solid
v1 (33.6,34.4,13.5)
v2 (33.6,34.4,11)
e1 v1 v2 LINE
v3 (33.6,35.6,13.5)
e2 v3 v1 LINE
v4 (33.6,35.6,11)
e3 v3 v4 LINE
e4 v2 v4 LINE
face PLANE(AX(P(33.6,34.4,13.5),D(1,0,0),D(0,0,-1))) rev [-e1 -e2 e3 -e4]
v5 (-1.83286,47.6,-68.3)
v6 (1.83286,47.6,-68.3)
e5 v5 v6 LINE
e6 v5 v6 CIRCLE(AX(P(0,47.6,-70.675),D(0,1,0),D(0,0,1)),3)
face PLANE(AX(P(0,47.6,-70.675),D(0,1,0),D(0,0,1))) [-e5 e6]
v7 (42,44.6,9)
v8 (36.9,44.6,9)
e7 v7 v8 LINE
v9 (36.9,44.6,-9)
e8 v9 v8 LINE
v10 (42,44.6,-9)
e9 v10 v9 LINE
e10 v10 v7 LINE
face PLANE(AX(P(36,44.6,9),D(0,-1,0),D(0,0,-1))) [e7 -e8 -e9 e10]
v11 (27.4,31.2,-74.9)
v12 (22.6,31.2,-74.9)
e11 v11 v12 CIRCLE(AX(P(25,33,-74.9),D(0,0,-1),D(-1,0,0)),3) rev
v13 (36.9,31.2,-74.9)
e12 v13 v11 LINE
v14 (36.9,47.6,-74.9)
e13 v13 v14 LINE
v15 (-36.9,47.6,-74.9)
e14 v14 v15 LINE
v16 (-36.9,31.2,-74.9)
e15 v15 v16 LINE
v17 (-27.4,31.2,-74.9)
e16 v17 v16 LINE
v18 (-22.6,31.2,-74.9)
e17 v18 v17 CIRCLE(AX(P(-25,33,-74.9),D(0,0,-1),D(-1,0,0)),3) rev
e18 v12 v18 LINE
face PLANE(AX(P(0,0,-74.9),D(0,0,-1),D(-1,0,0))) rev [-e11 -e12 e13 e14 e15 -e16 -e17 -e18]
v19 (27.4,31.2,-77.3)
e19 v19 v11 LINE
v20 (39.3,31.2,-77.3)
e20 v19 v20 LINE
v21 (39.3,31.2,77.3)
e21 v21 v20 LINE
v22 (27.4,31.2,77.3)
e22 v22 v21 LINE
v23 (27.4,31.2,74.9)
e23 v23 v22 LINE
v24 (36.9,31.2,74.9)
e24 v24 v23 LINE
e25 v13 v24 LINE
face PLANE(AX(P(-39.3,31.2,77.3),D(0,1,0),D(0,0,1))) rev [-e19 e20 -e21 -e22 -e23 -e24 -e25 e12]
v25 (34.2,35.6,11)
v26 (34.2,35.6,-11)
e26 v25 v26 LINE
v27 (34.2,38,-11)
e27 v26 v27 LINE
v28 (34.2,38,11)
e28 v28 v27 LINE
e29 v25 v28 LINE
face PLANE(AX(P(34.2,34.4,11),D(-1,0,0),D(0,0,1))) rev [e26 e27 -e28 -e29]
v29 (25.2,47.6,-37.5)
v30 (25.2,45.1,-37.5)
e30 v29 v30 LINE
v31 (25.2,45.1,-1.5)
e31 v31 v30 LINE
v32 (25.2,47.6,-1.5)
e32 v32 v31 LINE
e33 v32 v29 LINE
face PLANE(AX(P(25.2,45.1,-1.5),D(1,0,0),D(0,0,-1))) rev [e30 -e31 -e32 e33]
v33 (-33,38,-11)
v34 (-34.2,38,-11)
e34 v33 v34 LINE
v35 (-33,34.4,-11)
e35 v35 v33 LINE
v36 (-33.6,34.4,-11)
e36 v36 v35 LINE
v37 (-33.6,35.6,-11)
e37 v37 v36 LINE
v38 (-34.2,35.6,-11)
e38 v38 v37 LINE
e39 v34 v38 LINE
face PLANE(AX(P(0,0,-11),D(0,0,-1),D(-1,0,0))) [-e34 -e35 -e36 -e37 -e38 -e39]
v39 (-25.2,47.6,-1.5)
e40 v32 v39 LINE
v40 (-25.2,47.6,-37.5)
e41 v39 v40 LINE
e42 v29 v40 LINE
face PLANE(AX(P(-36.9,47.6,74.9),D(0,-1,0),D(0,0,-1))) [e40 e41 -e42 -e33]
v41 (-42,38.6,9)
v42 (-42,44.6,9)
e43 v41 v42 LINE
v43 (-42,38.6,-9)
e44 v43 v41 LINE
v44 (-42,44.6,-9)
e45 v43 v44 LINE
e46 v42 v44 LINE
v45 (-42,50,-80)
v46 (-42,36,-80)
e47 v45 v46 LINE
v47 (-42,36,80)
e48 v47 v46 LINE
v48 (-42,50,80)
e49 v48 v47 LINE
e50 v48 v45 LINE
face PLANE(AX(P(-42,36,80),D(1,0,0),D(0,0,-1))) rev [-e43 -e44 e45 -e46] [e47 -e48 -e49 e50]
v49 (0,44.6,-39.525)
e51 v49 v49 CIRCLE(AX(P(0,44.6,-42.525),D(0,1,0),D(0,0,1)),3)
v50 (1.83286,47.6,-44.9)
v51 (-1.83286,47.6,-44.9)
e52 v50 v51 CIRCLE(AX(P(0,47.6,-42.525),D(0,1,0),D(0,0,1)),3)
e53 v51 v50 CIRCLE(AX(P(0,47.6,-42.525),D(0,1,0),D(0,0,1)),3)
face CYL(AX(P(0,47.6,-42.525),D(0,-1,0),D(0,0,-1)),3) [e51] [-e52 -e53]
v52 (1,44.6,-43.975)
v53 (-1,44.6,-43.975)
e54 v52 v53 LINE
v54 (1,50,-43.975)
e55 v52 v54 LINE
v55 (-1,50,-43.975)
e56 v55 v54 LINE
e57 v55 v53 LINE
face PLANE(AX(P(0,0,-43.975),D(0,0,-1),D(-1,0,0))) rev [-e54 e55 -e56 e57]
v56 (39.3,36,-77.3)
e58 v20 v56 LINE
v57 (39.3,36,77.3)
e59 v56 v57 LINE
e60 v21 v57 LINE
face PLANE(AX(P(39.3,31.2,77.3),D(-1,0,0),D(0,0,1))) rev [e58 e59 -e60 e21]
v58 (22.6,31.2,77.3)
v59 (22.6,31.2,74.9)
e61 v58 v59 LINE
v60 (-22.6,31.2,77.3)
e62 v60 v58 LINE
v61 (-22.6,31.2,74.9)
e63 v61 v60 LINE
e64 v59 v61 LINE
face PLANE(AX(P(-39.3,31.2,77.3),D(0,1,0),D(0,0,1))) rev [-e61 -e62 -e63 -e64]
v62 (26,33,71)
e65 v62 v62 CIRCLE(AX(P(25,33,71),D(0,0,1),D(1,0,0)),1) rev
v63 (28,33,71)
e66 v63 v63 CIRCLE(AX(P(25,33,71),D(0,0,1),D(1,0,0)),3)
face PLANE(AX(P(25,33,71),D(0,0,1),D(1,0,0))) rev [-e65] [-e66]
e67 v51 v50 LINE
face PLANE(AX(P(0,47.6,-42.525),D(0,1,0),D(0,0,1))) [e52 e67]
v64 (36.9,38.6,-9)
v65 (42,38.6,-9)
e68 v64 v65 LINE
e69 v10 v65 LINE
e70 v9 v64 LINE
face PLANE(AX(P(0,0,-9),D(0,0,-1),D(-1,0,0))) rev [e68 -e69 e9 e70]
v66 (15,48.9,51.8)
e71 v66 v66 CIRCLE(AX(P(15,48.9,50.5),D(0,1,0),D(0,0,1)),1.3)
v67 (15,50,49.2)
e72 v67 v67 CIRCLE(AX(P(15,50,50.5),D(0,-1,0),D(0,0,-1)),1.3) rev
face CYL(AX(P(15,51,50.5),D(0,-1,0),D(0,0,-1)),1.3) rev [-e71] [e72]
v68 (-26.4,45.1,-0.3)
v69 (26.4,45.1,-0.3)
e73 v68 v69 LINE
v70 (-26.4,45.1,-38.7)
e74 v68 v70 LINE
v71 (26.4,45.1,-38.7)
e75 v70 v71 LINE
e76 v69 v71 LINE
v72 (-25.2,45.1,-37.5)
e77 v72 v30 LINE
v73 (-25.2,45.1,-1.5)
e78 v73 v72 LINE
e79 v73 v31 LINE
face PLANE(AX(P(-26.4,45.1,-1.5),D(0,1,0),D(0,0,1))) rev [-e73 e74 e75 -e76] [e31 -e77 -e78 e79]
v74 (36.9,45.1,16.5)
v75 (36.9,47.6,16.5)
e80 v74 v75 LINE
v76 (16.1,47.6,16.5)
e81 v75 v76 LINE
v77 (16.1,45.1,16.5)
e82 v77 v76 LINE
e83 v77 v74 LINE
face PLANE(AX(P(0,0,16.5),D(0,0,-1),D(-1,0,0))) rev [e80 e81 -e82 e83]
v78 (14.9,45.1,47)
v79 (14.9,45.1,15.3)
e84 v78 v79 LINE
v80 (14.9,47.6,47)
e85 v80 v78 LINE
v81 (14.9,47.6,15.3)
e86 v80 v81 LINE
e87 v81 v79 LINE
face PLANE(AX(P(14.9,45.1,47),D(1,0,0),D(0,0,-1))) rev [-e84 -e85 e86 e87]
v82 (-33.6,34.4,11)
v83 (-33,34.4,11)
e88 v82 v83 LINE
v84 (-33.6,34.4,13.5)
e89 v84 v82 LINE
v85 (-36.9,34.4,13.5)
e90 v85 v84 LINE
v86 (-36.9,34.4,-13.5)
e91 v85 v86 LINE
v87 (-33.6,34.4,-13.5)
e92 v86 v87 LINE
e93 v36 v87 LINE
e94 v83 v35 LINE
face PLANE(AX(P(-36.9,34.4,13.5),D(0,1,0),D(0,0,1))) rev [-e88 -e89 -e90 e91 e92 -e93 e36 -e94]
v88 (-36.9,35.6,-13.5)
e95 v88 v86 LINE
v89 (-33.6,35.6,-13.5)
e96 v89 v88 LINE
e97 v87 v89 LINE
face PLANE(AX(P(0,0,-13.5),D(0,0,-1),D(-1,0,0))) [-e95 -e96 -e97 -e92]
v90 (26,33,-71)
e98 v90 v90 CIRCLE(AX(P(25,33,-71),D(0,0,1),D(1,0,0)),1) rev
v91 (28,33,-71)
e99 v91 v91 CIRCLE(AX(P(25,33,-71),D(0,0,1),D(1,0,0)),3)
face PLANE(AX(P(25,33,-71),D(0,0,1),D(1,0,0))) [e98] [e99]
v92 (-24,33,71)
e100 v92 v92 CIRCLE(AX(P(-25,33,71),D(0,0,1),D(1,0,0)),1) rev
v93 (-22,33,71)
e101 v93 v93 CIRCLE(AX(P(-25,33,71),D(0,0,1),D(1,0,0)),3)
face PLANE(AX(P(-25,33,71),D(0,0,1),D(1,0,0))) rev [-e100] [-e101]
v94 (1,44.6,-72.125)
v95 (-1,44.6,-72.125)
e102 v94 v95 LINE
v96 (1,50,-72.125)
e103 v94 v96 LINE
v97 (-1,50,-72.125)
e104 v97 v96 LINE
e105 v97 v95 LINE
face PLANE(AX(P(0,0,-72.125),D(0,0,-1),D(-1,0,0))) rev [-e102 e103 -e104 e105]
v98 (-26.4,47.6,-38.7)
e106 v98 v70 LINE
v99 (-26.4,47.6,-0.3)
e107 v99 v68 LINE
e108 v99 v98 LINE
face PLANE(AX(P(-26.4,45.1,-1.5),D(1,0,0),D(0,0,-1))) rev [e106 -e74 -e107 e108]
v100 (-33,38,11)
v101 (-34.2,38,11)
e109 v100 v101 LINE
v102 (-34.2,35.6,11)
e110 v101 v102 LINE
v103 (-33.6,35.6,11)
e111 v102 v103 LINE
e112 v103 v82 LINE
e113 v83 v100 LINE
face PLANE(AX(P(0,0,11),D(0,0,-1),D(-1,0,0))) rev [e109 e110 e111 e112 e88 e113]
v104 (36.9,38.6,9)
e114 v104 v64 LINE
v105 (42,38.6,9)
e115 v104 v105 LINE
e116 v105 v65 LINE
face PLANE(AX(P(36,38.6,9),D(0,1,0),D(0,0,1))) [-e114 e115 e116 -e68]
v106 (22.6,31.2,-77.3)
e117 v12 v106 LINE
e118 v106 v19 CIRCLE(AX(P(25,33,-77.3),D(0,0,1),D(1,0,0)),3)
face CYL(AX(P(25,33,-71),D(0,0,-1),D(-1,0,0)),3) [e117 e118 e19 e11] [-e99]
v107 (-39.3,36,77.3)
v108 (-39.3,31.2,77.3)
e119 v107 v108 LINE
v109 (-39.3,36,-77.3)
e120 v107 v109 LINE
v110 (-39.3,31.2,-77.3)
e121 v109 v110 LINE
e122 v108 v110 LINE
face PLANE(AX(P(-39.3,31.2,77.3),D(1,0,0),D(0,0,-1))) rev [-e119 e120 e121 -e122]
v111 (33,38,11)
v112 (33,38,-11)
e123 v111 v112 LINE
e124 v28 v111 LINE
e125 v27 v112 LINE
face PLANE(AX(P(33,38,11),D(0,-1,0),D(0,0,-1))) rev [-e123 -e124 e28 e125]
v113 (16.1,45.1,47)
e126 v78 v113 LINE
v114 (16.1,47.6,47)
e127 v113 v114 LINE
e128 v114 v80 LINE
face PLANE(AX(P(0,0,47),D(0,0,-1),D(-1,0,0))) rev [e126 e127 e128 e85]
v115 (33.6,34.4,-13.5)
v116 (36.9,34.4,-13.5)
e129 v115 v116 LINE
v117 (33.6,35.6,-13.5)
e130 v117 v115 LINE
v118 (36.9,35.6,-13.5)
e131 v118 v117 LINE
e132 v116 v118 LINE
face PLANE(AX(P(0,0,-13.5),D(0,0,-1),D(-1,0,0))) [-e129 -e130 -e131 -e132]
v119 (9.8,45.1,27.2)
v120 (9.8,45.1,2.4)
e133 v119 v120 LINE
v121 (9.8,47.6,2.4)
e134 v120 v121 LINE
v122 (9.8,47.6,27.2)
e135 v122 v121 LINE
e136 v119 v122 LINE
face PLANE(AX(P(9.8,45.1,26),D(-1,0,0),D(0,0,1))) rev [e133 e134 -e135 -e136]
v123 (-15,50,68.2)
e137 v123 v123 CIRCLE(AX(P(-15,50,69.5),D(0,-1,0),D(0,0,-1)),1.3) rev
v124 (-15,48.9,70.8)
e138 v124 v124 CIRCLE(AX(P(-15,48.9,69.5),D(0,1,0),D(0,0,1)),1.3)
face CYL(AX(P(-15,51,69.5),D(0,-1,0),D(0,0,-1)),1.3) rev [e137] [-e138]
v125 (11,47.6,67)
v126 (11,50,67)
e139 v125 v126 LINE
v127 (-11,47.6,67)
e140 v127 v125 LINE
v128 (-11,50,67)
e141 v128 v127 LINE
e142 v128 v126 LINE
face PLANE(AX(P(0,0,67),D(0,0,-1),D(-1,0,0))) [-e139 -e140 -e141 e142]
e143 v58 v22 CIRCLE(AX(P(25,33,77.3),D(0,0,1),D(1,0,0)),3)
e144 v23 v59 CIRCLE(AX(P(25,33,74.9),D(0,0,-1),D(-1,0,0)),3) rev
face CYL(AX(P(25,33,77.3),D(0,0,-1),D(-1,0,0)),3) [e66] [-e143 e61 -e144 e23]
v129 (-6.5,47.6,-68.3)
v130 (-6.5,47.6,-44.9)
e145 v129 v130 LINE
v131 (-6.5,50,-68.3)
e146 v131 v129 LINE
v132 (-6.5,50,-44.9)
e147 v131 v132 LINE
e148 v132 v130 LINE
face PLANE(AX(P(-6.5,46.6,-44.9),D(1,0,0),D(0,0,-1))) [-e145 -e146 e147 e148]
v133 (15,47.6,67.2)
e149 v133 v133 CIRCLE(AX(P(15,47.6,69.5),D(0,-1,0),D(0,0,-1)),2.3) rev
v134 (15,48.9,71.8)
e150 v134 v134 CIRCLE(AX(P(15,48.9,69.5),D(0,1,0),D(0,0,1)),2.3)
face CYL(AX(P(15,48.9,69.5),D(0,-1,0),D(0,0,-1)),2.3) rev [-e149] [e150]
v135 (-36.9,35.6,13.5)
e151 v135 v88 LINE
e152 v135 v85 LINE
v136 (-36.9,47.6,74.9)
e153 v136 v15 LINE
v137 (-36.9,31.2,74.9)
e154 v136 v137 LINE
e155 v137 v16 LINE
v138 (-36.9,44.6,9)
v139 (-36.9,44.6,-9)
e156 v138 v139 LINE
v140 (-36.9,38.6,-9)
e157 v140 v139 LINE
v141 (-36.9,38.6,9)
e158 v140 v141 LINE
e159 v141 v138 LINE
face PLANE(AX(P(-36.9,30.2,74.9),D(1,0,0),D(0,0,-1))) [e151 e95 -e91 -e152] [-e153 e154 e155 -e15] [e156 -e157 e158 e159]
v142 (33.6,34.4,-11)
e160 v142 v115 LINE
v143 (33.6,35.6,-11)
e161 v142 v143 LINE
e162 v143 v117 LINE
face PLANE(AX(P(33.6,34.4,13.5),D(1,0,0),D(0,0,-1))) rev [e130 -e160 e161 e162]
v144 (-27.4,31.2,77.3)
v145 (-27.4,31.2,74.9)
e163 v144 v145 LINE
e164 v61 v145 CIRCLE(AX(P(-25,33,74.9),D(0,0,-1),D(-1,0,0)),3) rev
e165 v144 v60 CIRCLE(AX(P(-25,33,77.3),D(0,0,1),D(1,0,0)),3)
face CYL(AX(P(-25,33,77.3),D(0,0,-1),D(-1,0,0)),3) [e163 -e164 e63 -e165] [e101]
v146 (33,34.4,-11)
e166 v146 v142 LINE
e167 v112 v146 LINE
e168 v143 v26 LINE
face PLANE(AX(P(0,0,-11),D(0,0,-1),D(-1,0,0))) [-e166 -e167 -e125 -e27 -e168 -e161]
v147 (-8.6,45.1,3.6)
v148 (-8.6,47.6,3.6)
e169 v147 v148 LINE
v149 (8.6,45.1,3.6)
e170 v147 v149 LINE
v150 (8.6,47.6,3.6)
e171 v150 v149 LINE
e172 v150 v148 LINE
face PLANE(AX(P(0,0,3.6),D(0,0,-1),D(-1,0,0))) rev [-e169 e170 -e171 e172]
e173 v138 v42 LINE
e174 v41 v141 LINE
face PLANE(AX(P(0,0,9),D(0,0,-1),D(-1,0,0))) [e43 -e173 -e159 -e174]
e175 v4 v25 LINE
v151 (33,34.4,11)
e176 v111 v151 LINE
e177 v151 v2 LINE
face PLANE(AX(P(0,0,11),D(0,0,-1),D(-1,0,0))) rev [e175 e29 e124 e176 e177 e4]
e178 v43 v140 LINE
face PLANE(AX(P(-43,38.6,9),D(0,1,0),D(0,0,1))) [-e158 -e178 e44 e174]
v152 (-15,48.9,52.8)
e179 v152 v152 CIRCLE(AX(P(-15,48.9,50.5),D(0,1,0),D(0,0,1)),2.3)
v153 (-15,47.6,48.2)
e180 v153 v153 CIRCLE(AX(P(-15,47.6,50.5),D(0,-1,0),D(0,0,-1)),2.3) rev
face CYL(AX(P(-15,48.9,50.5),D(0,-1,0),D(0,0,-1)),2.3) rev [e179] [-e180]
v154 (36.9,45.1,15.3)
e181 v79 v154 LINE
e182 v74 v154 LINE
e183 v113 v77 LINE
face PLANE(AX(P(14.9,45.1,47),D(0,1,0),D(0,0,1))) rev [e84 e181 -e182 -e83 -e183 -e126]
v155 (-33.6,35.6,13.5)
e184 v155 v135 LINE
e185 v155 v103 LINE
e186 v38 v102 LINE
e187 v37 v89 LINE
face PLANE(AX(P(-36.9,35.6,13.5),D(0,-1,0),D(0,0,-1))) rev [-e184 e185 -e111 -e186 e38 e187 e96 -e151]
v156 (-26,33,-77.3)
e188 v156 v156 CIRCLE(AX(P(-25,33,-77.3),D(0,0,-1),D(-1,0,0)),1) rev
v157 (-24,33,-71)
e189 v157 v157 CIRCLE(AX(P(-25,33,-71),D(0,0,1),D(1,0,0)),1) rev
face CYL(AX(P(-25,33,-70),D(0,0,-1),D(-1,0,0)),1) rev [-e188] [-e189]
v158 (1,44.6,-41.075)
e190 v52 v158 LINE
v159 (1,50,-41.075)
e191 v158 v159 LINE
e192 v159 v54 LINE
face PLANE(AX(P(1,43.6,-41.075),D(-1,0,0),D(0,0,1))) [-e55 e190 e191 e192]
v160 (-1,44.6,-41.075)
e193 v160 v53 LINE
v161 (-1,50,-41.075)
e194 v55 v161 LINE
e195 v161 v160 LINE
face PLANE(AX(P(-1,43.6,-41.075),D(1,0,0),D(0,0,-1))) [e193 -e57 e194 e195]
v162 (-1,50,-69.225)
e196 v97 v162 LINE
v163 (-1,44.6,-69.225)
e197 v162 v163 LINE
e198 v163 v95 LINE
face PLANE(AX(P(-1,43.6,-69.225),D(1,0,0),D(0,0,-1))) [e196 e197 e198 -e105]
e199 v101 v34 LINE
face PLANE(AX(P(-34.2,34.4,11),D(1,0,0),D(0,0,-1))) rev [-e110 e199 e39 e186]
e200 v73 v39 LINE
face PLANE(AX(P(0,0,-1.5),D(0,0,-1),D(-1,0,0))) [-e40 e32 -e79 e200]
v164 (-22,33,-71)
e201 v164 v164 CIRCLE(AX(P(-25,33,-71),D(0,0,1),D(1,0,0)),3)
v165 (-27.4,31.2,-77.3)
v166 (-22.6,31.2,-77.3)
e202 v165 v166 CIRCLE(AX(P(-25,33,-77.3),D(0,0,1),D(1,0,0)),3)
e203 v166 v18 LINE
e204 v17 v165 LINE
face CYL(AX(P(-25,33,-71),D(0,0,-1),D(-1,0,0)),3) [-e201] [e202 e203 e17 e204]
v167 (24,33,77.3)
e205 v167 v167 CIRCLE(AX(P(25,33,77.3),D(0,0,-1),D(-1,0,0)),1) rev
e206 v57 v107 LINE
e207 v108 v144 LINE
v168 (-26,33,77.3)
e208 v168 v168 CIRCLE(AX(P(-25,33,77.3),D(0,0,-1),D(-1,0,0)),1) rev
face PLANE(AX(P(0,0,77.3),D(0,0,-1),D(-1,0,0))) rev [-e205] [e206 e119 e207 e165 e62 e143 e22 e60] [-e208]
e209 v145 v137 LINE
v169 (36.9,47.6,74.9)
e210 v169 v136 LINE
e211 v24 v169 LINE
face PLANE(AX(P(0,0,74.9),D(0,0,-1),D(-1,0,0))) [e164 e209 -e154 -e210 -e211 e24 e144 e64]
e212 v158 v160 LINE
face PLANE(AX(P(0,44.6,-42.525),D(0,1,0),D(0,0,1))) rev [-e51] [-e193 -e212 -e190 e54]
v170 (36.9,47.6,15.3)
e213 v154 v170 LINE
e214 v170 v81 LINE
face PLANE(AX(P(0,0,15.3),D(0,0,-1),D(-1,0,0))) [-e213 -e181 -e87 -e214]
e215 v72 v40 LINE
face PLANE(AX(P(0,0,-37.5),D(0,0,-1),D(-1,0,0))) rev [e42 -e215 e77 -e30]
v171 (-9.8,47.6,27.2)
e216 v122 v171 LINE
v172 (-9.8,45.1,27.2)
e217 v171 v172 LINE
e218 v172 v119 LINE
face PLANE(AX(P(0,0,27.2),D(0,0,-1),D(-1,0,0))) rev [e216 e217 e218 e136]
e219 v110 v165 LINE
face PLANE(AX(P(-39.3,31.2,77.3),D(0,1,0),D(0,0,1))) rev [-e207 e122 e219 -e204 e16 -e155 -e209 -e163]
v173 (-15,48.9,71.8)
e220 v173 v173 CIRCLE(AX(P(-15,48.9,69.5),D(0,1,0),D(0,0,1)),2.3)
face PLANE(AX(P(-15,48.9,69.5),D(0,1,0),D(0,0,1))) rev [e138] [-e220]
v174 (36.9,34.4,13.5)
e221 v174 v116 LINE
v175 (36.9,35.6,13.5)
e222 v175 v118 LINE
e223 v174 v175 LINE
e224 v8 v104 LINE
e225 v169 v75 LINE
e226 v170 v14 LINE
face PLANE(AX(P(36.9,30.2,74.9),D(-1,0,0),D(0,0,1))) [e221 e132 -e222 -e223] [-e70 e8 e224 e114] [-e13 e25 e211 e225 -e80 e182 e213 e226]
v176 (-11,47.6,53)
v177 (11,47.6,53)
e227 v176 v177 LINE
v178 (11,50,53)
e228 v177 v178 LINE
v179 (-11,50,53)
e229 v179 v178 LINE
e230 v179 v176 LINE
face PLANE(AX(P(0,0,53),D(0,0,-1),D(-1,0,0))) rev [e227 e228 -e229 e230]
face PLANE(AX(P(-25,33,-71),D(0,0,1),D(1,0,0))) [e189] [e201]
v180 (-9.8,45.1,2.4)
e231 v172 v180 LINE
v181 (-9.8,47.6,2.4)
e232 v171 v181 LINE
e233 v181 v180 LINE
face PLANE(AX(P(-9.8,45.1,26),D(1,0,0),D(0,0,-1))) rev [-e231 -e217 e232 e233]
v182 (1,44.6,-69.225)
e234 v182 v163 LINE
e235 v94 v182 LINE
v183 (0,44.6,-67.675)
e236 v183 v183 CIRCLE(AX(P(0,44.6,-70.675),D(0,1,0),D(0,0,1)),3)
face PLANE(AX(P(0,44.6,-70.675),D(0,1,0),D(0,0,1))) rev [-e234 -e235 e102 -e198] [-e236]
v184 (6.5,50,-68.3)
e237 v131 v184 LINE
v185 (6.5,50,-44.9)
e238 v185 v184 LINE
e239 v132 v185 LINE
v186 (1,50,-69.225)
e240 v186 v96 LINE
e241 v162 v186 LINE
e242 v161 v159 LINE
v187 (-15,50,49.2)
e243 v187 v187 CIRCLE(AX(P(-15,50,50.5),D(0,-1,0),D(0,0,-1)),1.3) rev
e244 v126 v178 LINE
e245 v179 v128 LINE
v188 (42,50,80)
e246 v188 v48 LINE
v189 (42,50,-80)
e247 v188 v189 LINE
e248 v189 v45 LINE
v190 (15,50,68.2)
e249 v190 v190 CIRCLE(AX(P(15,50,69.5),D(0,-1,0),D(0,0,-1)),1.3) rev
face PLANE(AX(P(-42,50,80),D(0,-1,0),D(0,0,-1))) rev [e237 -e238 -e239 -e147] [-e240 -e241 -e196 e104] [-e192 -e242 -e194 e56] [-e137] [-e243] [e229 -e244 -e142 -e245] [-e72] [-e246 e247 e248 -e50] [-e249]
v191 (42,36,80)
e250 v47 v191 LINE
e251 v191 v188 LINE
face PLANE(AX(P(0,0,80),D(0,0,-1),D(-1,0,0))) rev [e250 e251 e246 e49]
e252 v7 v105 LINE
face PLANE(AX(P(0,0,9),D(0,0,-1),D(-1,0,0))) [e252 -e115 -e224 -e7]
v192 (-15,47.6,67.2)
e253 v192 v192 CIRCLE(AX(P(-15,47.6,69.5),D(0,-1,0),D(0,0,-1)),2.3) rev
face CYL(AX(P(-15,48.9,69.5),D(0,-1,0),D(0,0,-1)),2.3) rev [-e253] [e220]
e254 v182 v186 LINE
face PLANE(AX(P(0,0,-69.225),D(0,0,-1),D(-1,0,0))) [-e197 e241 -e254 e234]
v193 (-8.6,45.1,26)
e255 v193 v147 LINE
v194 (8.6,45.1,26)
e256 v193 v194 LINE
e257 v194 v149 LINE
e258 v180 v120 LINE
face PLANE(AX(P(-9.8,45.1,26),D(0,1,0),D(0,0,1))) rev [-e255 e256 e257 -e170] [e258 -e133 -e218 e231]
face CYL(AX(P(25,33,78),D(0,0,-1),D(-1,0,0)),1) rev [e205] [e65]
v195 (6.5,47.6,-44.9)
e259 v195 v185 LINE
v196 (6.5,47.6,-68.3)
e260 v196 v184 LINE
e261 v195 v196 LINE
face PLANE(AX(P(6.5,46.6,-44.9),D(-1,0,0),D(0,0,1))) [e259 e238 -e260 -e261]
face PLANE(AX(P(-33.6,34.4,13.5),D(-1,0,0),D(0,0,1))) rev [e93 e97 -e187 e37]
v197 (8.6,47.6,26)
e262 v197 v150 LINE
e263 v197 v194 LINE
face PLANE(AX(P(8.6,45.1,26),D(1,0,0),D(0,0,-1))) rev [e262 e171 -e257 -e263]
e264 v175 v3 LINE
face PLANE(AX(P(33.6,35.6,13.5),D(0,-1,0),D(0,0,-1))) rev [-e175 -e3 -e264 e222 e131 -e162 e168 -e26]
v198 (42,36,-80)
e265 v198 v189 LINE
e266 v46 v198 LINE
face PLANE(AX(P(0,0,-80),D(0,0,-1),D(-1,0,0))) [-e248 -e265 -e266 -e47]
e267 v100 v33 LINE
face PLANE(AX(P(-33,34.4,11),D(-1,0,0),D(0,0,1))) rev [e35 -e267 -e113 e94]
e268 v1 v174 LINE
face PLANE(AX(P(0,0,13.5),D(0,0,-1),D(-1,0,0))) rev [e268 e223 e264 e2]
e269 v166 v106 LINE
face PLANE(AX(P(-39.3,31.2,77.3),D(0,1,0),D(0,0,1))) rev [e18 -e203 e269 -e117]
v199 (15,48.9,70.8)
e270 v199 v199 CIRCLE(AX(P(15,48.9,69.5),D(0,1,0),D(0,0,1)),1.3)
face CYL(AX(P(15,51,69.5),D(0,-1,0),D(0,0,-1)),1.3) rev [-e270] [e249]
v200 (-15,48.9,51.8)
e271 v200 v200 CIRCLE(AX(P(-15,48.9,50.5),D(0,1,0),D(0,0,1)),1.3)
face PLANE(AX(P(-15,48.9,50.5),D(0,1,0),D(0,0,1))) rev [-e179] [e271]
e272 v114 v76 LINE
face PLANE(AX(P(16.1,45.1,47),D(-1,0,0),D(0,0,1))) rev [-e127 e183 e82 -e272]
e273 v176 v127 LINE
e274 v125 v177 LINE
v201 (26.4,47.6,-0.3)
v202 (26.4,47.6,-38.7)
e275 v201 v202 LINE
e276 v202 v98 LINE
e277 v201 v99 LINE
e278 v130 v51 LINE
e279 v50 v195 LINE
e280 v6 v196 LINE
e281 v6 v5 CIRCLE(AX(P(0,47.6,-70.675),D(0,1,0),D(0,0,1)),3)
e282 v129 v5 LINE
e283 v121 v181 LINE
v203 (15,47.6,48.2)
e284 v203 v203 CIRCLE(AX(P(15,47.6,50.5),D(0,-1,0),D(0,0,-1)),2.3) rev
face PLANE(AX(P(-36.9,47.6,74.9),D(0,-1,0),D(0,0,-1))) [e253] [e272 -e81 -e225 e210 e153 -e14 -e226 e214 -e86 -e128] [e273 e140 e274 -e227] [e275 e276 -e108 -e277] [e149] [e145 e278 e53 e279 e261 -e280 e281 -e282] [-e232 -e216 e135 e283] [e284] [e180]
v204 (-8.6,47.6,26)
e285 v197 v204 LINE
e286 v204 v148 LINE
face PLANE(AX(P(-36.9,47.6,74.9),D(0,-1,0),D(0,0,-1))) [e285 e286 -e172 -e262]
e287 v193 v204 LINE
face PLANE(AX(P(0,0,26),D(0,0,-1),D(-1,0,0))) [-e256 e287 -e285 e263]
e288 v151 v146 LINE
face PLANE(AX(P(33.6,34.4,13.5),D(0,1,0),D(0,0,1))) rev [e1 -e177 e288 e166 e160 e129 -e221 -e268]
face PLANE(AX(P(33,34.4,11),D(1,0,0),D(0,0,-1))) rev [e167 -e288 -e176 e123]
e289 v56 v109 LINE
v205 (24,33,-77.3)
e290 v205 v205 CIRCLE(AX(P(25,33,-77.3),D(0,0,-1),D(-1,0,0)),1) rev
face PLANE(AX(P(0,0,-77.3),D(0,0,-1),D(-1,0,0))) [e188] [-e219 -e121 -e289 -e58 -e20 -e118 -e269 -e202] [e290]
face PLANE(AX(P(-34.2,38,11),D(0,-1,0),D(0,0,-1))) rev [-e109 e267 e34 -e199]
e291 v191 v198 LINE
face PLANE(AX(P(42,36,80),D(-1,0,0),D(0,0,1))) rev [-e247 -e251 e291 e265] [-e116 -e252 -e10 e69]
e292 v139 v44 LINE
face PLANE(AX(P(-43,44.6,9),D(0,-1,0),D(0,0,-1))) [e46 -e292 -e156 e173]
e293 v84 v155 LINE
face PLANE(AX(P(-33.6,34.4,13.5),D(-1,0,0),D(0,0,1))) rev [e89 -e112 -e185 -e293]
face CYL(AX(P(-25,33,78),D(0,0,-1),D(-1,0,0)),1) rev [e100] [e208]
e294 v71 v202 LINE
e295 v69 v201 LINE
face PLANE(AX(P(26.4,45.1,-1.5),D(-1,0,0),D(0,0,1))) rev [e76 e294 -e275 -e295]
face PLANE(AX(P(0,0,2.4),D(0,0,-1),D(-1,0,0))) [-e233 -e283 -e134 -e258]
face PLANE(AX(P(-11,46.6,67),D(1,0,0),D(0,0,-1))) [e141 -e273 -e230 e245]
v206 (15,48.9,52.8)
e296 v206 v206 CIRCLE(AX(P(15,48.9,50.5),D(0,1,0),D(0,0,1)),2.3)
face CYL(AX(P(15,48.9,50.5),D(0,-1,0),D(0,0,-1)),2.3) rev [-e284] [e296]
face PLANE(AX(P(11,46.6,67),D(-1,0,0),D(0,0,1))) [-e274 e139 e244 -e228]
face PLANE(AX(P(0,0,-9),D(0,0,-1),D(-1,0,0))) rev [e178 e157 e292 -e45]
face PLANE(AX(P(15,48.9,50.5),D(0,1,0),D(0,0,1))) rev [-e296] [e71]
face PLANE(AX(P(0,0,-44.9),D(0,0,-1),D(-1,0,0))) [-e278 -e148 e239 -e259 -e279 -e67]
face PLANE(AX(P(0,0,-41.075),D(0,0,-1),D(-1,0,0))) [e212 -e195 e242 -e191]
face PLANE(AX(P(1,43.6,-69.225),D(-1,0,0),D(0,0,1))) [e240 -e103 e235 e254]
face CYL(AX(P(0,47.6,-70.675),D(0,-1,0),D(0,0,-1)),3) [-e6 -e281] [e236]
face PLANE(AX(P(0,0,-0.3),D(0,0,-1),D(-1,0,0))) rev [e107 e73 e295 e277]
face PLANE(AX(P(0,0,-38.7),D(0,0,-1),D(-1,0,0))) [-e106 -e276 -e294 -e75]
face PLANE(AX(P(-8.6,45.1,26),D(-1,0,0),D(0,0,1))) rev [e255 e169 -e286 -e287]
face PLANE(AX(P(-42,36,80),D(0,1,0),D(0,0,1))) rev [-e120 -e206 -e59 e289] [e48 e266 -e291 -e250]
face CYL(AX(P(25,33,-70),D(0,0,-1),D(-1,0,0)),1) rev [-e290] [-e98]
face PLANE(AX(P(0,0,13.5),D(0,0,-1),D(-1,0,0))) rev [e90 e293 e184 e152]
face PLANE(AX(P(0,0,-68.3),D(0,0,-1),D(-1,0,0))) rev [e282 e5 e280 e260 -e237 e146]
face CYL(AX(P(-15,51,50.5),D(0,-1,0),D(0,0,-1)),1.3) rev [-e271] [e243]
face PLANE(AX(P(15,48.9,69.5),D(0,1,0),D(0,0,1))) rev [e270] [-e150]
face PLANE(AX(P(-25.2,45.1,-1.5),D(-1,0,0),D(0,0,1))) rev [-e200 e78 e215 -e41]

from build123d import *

# Parameters (mm, degrees)
BOSS_EXTRUDE1_START  = -80
SKETCH1_W            = 84
SKETCH1_H            = 14
BOSS_EXTRUDE1_DEPTH  = 160
BOSS_EXTRUDE2_START  = -77.3
SKETCH2_W            = 78.6
SKETCH2_H            = 5.3
BOSS_EXTRUDE2_DEPTH  = 154.6
BOSS_EXTRUDE3_START  = -74.9
SKETCH3_W            = 73.8
SKETCH3_H            = 17.4
BOSS_EXTRUDE3_DEPTH  = 149.8
BOSS_EXTRUDE4_START  = -77.3
SKETCH4_R            = 3
BOSS_EXTRUDE4_DEPTH  = 6.3
BOSS_EXTRUDE5_START  = -78
SKETCH5_R            = 1
BOSS_EXTRUDE5_DEPTH  = 8
BOSS_EXTRUDE6_START  = -77.3
SKETCH6_R            = 3
BOSS_EXTRUDE6_DEPTH  = 6.3
BOSS_EXTRUDE7_START  = -78
SKETCH7_R            = 1
BOSS_EXTRUDE7_DEPTH  = 8
BOSS_EXTRUDE8_START  = 71
SKETCH8_R            = 3
BOSS_EXTRUDE8_DEPTH  = 6.3
BOSS_EXTRUDE9_START  = 70
SKETCH9_R            = 1
BOSS_EXTRUDE9_DEPTH  = 8
BOSS_EXTRUDE10_START = 71
SKETCH10_R           = 3
BOSS_EXTRUDE10_DEPTH = 6.3
BOSS_EXTRUDE11_START = 70
SKETCH11_R           = 1
BOSS_EXTRUDE11_DEPTH = 8
BOSS_EXTRUDE12_START = 53
SKETCH12_W           = 22
SKETCH12_H           = 4.4
BOSS_EXTRUDE12_DEPTH = 14
BOSS_EXTRUDE13_START = 46.6
SKETCH13_R           = 1.3
BOSS_EXTRUDE13_DEPTH = 4.4
BOSS_EXTRUDE14_START = 47.1
SKETCH14_R           = 2.3
BOSS_EXTRUDE14_DEPTH = 1.8
BOSS_EXTRUDE15_START = 46.6
SKETCH15_R           = 1.3
BOSS_EXTRUDE15_DEPTH = 4.4
BOSS_EXTRUDE16_START = 47.1
SKETCH16_R           = 2.3
BOSS_EXTRUDE16_DEPTH = 1.8
BOSS_EXTRUDE17_START = 46.6
SKETCH17_R           = 1.3
BOSS_EXTRUDE17_DEPTH = 4.4
BOSS_EXTRUDE18_START = 47.1
SKETCH18_R           = 2.3
BOSS_EXTRUDE18_DEPTH = 1.8
BOSS_EXTRUDE19_START = 46.6
SKETCH19_R           = 1.3
BOSS_EXTRUDE19_DEPTH = 4.4
BOSS_EXTRUDE20_START = 47.1
SKETCH20_R           = 2.3
BOSS_EXTRUDE20_DEPTH = 1.8
BOSS_EXTRUDE21_START = -68.3
SKETCH21_W           = 13
SKETCH21_H           = 4.4
BOSS_EXTRUDE21_DEPTH = 23.4
BOSS_EXTRUDE22_START = 44.6
SKETCH22_R           = 3
BOSS_EXTRUDE22_DEPTH = 3
BOSS_EXTRUDE23_START = -72.125
SKETCH23_W           = 2
SKETCH23_H           = 7.4
BOSS_EXTRUDE23_DEPTH = 2.9
BOSS_EXTRUDE24_START = 44.6
SKETCH24_R           = 3
BOSS_EXTRUDE24_DEPTH = 3
BOSS_EXTRUDE25_START = -43.975
SKETCH25_W           = 2
SKETCH25_H           = 7.4
BOSS_EXTRUDE25_DEPTH = 2.9
BOSS_EXTRUDE26_START = -9
SKETCH26_W           = 7
SKETCH26_H           = 6
BOSS_EXTRUDE26_DEPTH = 18
BOSS_EXTRUDE27_START = -13.5
SKETCH27_W           = 3.3
SKETCH27_H           = 1.2
BOSS_EXTRUDE27_DEPTH = 27
BOSS_EXTRUDE28_START = -11
SKETCH28_W           = 1.2
SKETCH28_H           = 3.6
BOSS_EXTRUDE28_DEPTH = 22
BOSS_EXTRUDE29_START = -9
SKETCH29_W           = 7
SKETCH29_H           = 6
BOSS_EXTRUDE29_DEPTH = 18
BOSS_EXTRUDE30_START = -13.5
SKETCH30_W           = 3.3
SKETCH30_H           = 1.2
BOSS_EXTRUDE30_DEPTH = 27
BOSS_EXTRUDE31_START = -11
SKETCH31_W           = 1.2
SKETCH31_H           = 3.6
BOSS_EXTRUDE31_DEPTH = 22
BOSS_EXTRUDE32_START = 3.6
SKETCH32_W           = 1.2
SKETCH32_H           = 2.5
BOSS_EXTRUDE32_DEPTH = 22.4
BOSS_EXTRUDE33_START = 3.6
SKETCH33_W           = 1.2
SKETCH33_H           = 2.5
BOSS_EXTRUDE33_DEPTH = 22.4
BOSS_EXTRUDE34_START = 2.4
SKETCH34_W           = 19.6
SKETCH34_H           = 2.5
BOSS_EXTRUDE34_DEPTH = 1.2
BOSS_EXTRUDE35_START = 26
SKETCH35_W           = 19.6
SKETCH35_H           = 2.5
BOSS_EXTRUDE35_DEPTH = 1.2
BOSS_EXTRUDE36_START = 16.5
SKETCH36_W           = 1.2
SKETCH36_H           = 2.5
BOSS_EXTRUDE36_DEPTH = 30.5
BOSS_EXTRUDE37_START = 15.3
SKETCH37_W           = 22
SKETCH37_H           = 2.5
BOSS_EXTRUDE37_DEPTH = 1.2
BOSS_EXTRUDE38_START = -37.5
SKETCH38_W           = 1.2
SKETCH38_H           = 2.5
BOSS_EXTRUDE38_DEPTH = 36
BOSS_EXTRUDE39_START = -37.5
SKETCH39_W           = 1.2
SKETCH39_H           = 2.5
BOSS_EXTRUDE39_DEPTH = 36
BOSS_EXTRUDE40_START = -38.7
SKETCH40_W           = 52.8
SKETCH40_H           = 2.5
BOSS_EXTRUDE40_DEPTH = 1.2
BOSS_EXTRUDE41_START = -1.5
SKETCH41_W           = 52.8
SKETCH41_H           = 2.5
BOSS_EXTRUDE41_DEPTH = 1.2


with BuildPart() as part:
    # Sketch1 → Boss-Extrude1 (new body)
    with BuildSketch(Plane.XY.offset(BOSS_EXTRUDE1_START)):
        with Locations((0, 43)):
            Rectangle(SKETCH1_W, SKETCH1_H)
    extrude(amount=BOSS_EXTRUDE1_DEPTH)

    # Sketch2 → Boss-Extrude2 (add)
    with BuildSketch(Plane.XY.offset(BOSS_EXTRUDE2_START)):
        with Locations((0, 33.85)):
            Rectangle(SKETCH2_W, SKETCH2_H)
    extrude(amount=BOSS_EXTRUDE2_DEPTH)


with BuildPart() as body_2:
    # Sketch3 → Boss-Extrude3 (new body)
    with BuildSketch(Plane.XY.offset(BOSS_EXTRUDE3_START)):
        with Locations((0, 38.9)):
            Rectangle(SKETCH3_W, SKETCH3_H)
    extrude(amount=BOSS_EXTRUDE3_DEPTH)


with BuildPart() as part_1:
    add(part.part)

    # Combine1: cut body 2
    add(body_2.part, mode=Mode.SUBTRACT)

    # Sketch4 → Boss-Extrude4 (add)
    with BuildSketch(Plane.XY.offset(BOSS_EXTRUDE4_START)):
        with Locations((-25, 33)):
            Circle(SKETCH4_R)
    extrude(amount=BOSS_EXTRUDE4_DEPTH)


with BuildPart() as body_2_2:
    # Sketch5 → Boss-Extrude5 (new body)
    with BuildSketch(Plane.XY.offset(BOSS_EXTRUDE5_START)):
        with Locations((-25, 33)):
            Circle(SKETCH5_R)
    extrude(amount=BOSS_EXTRUDE5_DEPTH)


with BuildPart() as part_2:
    add(part_1.part)

    # Combine2: cut body 2 2
    add(body_2_2.part, mode=Mode.SUBTRACT)

    # Sketch6 → Boss-Extrude6 (add)
    with BuildSketch(Plane.XY.offset(BOSS_EXTRUDE6_START)):
        with Locations((25, 33)):
            Circle(SKETCH6_R)
    extrude(amount=BOSS_EXTRUDE6_DEPTH)


with BuildPart() as body_2_3:
    # Sketch7 → Boss-Extrude7 (new body)
    with BuildSketch(Plane.XY.offset(BOSS_EXTRUDE7_START)):
        with Locations((25, 33)):
            Circle(SKETCH7_R)
    extrude(amount=BOSS_EXTRUDE7_DEPTH)


with BuildPart() as part_3:
    add(part_2.part)

    # Combine3: cut body 2 3
    add(body_2_3.part, mode=Mode.SUBTRACT)

    # Sketch8 → Boss-Extrude8 (add)
    with BuildSketch(Plane.XY.offset(BOSS_EXTRUDE8_START)):
        with Locations((-25, 33)):
            Circle(SKETCH8_R)
    extrude(amount=BOSS_EXTRUDE8_DEPTH)


with BuildPart() as body_2_4:
    # Sketch9 → Boss-Extrude9 (new body)
    with BuildSketch(Plane.XY.offset(BOSS_EXTRUDE9_START)):
        with Locations((-25, 33)):
            Circle(SKETCH9_R)
    extrude(amount=BOSS_EXTRUDE9_DEPTH)


with BuildPart() as part_4:
    add(part_3.part)

    # Combine4: cut body 2 4
    add(body_2_4.part, mode=Mode.SUBTRACT)

    # Sketch10 → Boss-Extrude10 (add)
    with BuildSketch(Plane.XY.offset(BOSS_EXTRUDE10_START)):
        with Locations((25, 33)):
            Circle(SKETCH10_R)
    extrude(amount=BOSS_EXTRUDE10_DEPTH)


with BuildPart() as body_2_5:
    # Sketch11 → Boss-Extrude11 (new body)
    with BuildSketch(Plane.XY.offset(BOSS_EXTRUDE11_START)):
        with Locations((25, 33)):
            Circle(SKETCH11_R)
    extrude(amount=BOSS_EXTRUDE11_DEPTH)


with BuildPart() as part_5:
    add(part_4.part)

    # Combine5: cut body 2 5
    add(body_2_5.part, mode=Mode.SUBTRACT)


with BuildPart() as body_2_6:
    # Sketch12 → Boss-Extrude12 (new body)
    with BuildSketch(Plane.XY.offset(BOSS_EXTRUDE12_START)):
        with Locations((0, 48.8)):
            Rectangle(SKETCH12_W, SKETCH12_H)
    extrude(amount=BOSS_EXTRUDE12_DEPTH)


with BuildPart() as part_6:
    add(part_5.part)

    # Combine6: cut body 2 6
    add(body_2_6.part, mode=Mode.SUBTRACT)


with BuildPart() as body_2_7:
    # Sketch13 → Boss-Extrude13 (new body)
    with BuildSketch(Plane(origin=(0, 0, 0), x_dir=(1, 0, 0), z_dir=(0, 1, 0)).offset(BOSS_EXTRUDE13_START)):
        with Locations((-15, -50.5)):
            Circle(SKETCH13_R)
    extrude(amount=BOSS_EXTRUDE13_DEPTH)


with BuildPart() as part_7:
    add(part_6.part)

    # Combine7: cut body 2 7
    add(body_2_7.part, mode=Mode.SUBTRACT)


with BuildPart() as body_2_8:
    # Sketch14 → Boss-Extrude14 (new body)
    with BuildSketch(Plane(origin=(0, 0, 0), x_dir=(1, 0, 0), z_dir=(0, 1, 0)).offset(BOSS_EXTRUDE14_START)):
        with Locations((-15, -50.5)):
            Circle(SKETCH14_R)
    extrude(amount=BOSS_EXTRUDE14_DEPTH)


with BuildPart() as part_8:
    add(part_7.part)

    # Combine8: cut body 2 8
    add(body_2_8.part, mode=Mode.SUBTRACT)


with BuildPart() as body_2_9:
    # Sketch15 → Boss-Extrude15 (new body)
    with BuildSketch(Plane(origin=(0, 0, 0), x_dir=(1, 0, 0), z_dir=(0, 1, 0)).offset(BOSS_EXTRUDE15_START)):
        with Locations((-15, -69.5)):
            Circle(SKETCH15_R)
    extrude(amount=BOSS_EXTRUDE15_DEPTH)


with BuildPart() as part_9:
    add(part_8.part)

    # Combine9: cut body 2 9
    add(body_2_9.part, mode=Mode.SUBTRACT)


with BuildPart() as body_2_10:
    # Sketch16 → Boss-Extrude16 (new body)
    with BuildSketch(Plane(origin=(0, 0, 0), x_dir=(1, 0, 0), z_dir=(0, 1, 0)).offset(BOSS_EXTRUDE16_START)):
        with Locations((-15, -69.5)):
            Circle(SKETCH16_R)
    extrude(amount=BOSS_EXTRUDE16_DEPTH)


with BuildPart() as part_10:
    add(part_9.part)

    # Combine10: cut body 2 10
    add(body_2_10.part, mode=Mode.SUBTRACT)


with BuildPart() as body_2_11:
    # Sketch17 → Boss-Extrude17 (new body)
    with BuildSketch(Plane(origin=(0, 0, 0), x_dir=(1, 0, 0), z_dir=(0, 1, 0)).offset(BOSS_EXTRUDE17_START)):
        with Locations((15, -50.5)):
            Circle(SKETCH17_R)
    extrude(amount=BOSS_EXTRUDE17_DEPTH)


with BuildPart() as part_11:
    add(part_10.part)

    # Combine11: cut body 2 11
    add(body_2_11.part, mode=Mode.SUBTRACT)


with BuildPart() as body_2_12:
    # Sketch18 → Boss-Extrude18 (new body)
    with BuildSketch(Plane(origin=(0, 0, 0), x_dir=(1, 0, 0), z_dir=(0, 1, 0)).offset(BOSS_EXTRUDE18_START)):
        with Locations((15, -50.5)):
            Circle(SKETCH18_R)
    extrude(amount=BOSS_EXTRUDE18_DEPTH)


with BuildPart() as part_12:
    add(part_11.part)

    # Combine12: cut body 2 12
    add(body_2_12.part, mode=Mode.SUBTRACT)


with BuildPart() as body_2_13:
    # Sketch19 → Boss-Extrude19 (new body)
    with BuildSketch(Plane(origin=(0, 0, 0), x_dir=(1, 0, 0), z_dir=(0, 1, 0)).offset(BOSS_EXTRUDE19_START)):
        with Locations((15, -69.5)):
            Circle(SKETCH19_R)
    extrude(amount=BOSS_EXTRUDE19_DEPTH)


with BuildPart() as part_13:
    add(part_12.part)

    # Combine13: cut body 2 13
    add(body_2_13.part, mode=Mode.SUBTRACT)


with BuildPart() as body_2_14:
    # Sketch20 → Boss-Extrude20 (new body)
    with BuildSketch(Plane(origin=(0, 0, 0), x_dir=(1, 0, 0), z_dir=(0, 1, 0)).offset(BOSS_EXTRUDE20_START)):
        with Locations((15, -69.5)):
            Circle(SKETCH20_R)
    extrude(amount=BOSS_EXTRUDE20_DEPTH)


with BuildPart() as part_14:
    add(part_13.part)

    # Combine14: cut body 2 14
    add(body_2_14.part, mode=Mode.SUBTRACT)


with BuildPart() as body_2_15:
    # Sketch21 → Boss-Extrude21 (new body)
    with BuildSketch(Plane.XY.offset(BOSS_EXTRUDE21_START)):
        with Locations((0, 48.8)):
            Rectangle(SKETCH21_W, SKETCH21_H)
    extrude(amount=BOSS_EXTRUDE21_DEPTH)


with BuildPart() as part_15:
    add(part_14.part)

    # Combine15: cut body 2 15
    add(body_2_15.part, mode=Mode.SUBTRACT)

    # Sketch22 → Boss-Extrude22 (add)
    with BuildSketch(Plane(origin=(0, 0, 0), x_dir=(1, 0, 0), z_dir=(0, 1, 0)).offset(BOSS_EXTRUDE22_START)):
        with Locations((0, 70.675)):
            Circle(SKETCH22_R)
    extrude(amount=BOSS_EXTRUDE22_DEPTH)


with BuildPart() as body_2_16:
    # Sketch23 → Boss-Extrude23 (new body)
    with BuildSketch(Plane.XY.offset(BOSS_EXTRUDE23_START)):
        with Locations((0, 47.3)):
            Rectangle(SKETCH23_W, SKETCH23_H)
    extrude(amount=BOSS_EXTRUDE23_DEPTH)


with BuildPart() as part_16:
    add(part_15.part)

    # Combine16: cut body 2 16
    add(body_2_16.part, mode=Mode.SUBTRACT)

    # Sketch24 → Boss-Extrude24 (add)
    with BuildSketch(Plane(origin=(0, 0, 0), x_dir=(1, 0, 0), z_dir=(0, 1, 0)).offset(BOSS_EXTRUDE24_START)):
        with Locations((0, 42.525)):
            Circle(SKETCH24_R)
    extrude(amount=BOSS_EXTRUDE24_DEPTH)


with BuildPart() as body_2_17:
    # Sketch25 → Boss-Extrude25 (new body)
    with BuildSketch(Plane.XY.offset(BOSS_EXTRUDE25_START)):
        with Locations((0, 47.3)):
            Rectangle(SKETCH25_W, SKETCH25_H)
    extrude(amount=BOSS_EXTRUDE25_DEPTH)


with BuildPart() as part_17:
    add(part_16.part)

    # Combine17: cut body 2 17
    add(body_2_17.part, mode=Mode.SUBTRACT)


with BuildPart() as body_2_18:
    # Sketch26 → Boss-Extrude26 (new body)
    with BuildSketch(Plane.XY.offset(BOSS_EXTRUDE26_START)):
        with Locations((-39.5, 41.6)):
            Rectangle(SKETCH26_W, SKETCH26_H)
    extrude(amount=BOSS_EXTRUDE26_DEPTH)


with BuildPart() as part_18:
    add(part_17.part)

    # Combine18: cut body 2 18
    add(body_2_18.part, mode=Mode.SUBTRACT)

    # Sketch27 → Boss-Extrude27 (add)
    with BuildSketch(Plane.XY.offset(BOSS_EXTRUDE27_START)):
        with Locations((-35.25, 35)):
            Rectangle(SKETCH27_W, SKETCH27_H)
    extrude(amount=BOSS_EXTRUDE27_DEPTH)

    # Sketch28 → Boss-Extrude28 (add)
    with BuildSketch(Plane.XY.offset(BOSS_EXTRUDE28_START)):
        with Locations((-33.6, 36.2)):
            Rectangle(SKETCH28_W, SKETCH28_H)
    extrude(amount=BOSS_EXTRUDE28_DEPTH)


with BuildPart() as body_2_19:
    # Sketch29 → Boss-Extrude29 (new body)
    with BuildSketch(Plane.XY.offset(BOSS_EXTRUDE29_START)):
        with Locations((39.5, 41.6)):
            Rectangle(SKETCH29_W, SKETCH29_H)
    extrude(amount=BOSS_EXTRUDE29_DEPTH)


with BuildPart() as part_19:
    add(part_18.part)

    # Combine19: cut body 2 19
    add(body_2_19.part, mode=Mode.SUBTRACT)

    # Sketch30 → Boss-Extrude30 (add)
    with BuildSketch(Plane.XY.offset(BOSS_EXTRUDE30_START)):
        with Locations((35.25, 35)):
            Rectangle(SKETCH30_W, SKETCH30_H)
    extrude(amount=BOSS_EXTRUDE30_DEPTH)

    # Sketch31 → Boss-Extrude31 (add)
    with BuildSketch(Plane.XY.offset(BOSS_EXTRUDE31_START)):
        with Locations((33.6, 36.2)):
            Rectangle(SKETCH31_W, SKETCH31_H)
    extrude(amount=BOSS_EXTRUDE31_DEPTH)

    # Sketch32 → Boss-Extrude32 (add)
    with BuildSketch(Plane.XY.offset(BOSS_EXTRUDE32_START)):
        with Locations((-9.2, 46.35)):
            Rectangle(SKETCH32_W, SKETCH32_H)
    extrude(amount=BOSS_EXTRUDE32_DEPTH)

    # Sketch33 → Boss-Extrude33 (add)
    with BuildSketch(Plane.XY.offset(BOSS_EXTRUDE33_START)):
        with Locations((9.2, 46.35)):
            Rectangle(SKETCH33_W, SKETCH33_H)
    extrude(amount=BOSS_EXTRUDE33_DEPTH)

    # Sketch34 → Boss-Extrude34 (add)
    with BuildSketch(Plane.XY.offset(BOSS_EXTRUDE34_START)):
        with Locations((0, 46.35)):
            Rectangle(SKETCH34_W, SKETCH34_H)
    extrude(amount=BOSS_EXTRUDE34_DEPTH)

    # Sketch35 → Boss-Extrude35 (add)
    with BuildSketch(Plane.XY.offset(BOSS_EXTRUDE35_START)):
        with Locations((0, 46.35)):
            Rectangle(SKETCH35_W, SKETCH35_H)
    extrude(amount=BOSS_EXTRUDE35_DEPTH)

    # Sketch36 → Boss-Extrude36 (add)
    with BuildSketch(Plane.XY.offset(BOSS_EXTRUDE36_START)):
        with Locations((15.5, 46.35)):
            Rectangle(SKETCH36_W, SKETCH36_H)
    extrude(amount=BOSS_EXTRUDE36_DEPTH)

    # Sketch37 → Boss-Extrude37 (add)
    with BuildSketch(Plane.XY.offset(BOSS_EXTRUDE37_START)):
        with Locations((25.9, 46.35)):
            Rectangle(SKETCH37_W, SKETCH37_H)
    extrude(amount=BOSS_EXTRUDE37_DEPTH)

    # Sketch38 → Boss-Extrude38 (add)
    with BuildSketch(Plane.XY.offset(BOSS_EXTRUDE38_START)):
        with Locations((-25.8, 46.35)):
            Rectangle(SKETCH38_W, SKETCH38_H)
    extrude(amount=BOSS_EXTRUDE38_DEPTH)

    # Sketch39 → Boss-Extrude39 (add)
    with BuildSketch(Plane.XY.offset(BOSS_EXTRUDE39_START)):
        with Locations((25.8, 46.35)):
            Rectangle(SKETCH39_W, SKETCH39_H)
    extrude(amount=BOSS_EXTRUDE39_DEPTH)

    # Sketch40 → Boss-Extrude40 (add)
    with BuildSketch(Plane.XY.offset(BOSS_EXTRUDE40_START)):
        with Locations((0, 46.35)):
            Rectangle(SKETCH40_W, SKETCH40_H)
    extrude(amount=BOSS_EXTRUDE40_DEPTH)

    # Sketch41 → Boss-Extrude41 (add)
    with BuildSketch(Plane.XY.offset(BOSS_EXTRUDE41_START)):
        with Locations((0, 46.35)):
            Rectangle(SKETCH41_W, SKETCH41_H)
    extrude(amount=BOSS_EXTRUDE41_DEPTH)


solid = part_19.part
